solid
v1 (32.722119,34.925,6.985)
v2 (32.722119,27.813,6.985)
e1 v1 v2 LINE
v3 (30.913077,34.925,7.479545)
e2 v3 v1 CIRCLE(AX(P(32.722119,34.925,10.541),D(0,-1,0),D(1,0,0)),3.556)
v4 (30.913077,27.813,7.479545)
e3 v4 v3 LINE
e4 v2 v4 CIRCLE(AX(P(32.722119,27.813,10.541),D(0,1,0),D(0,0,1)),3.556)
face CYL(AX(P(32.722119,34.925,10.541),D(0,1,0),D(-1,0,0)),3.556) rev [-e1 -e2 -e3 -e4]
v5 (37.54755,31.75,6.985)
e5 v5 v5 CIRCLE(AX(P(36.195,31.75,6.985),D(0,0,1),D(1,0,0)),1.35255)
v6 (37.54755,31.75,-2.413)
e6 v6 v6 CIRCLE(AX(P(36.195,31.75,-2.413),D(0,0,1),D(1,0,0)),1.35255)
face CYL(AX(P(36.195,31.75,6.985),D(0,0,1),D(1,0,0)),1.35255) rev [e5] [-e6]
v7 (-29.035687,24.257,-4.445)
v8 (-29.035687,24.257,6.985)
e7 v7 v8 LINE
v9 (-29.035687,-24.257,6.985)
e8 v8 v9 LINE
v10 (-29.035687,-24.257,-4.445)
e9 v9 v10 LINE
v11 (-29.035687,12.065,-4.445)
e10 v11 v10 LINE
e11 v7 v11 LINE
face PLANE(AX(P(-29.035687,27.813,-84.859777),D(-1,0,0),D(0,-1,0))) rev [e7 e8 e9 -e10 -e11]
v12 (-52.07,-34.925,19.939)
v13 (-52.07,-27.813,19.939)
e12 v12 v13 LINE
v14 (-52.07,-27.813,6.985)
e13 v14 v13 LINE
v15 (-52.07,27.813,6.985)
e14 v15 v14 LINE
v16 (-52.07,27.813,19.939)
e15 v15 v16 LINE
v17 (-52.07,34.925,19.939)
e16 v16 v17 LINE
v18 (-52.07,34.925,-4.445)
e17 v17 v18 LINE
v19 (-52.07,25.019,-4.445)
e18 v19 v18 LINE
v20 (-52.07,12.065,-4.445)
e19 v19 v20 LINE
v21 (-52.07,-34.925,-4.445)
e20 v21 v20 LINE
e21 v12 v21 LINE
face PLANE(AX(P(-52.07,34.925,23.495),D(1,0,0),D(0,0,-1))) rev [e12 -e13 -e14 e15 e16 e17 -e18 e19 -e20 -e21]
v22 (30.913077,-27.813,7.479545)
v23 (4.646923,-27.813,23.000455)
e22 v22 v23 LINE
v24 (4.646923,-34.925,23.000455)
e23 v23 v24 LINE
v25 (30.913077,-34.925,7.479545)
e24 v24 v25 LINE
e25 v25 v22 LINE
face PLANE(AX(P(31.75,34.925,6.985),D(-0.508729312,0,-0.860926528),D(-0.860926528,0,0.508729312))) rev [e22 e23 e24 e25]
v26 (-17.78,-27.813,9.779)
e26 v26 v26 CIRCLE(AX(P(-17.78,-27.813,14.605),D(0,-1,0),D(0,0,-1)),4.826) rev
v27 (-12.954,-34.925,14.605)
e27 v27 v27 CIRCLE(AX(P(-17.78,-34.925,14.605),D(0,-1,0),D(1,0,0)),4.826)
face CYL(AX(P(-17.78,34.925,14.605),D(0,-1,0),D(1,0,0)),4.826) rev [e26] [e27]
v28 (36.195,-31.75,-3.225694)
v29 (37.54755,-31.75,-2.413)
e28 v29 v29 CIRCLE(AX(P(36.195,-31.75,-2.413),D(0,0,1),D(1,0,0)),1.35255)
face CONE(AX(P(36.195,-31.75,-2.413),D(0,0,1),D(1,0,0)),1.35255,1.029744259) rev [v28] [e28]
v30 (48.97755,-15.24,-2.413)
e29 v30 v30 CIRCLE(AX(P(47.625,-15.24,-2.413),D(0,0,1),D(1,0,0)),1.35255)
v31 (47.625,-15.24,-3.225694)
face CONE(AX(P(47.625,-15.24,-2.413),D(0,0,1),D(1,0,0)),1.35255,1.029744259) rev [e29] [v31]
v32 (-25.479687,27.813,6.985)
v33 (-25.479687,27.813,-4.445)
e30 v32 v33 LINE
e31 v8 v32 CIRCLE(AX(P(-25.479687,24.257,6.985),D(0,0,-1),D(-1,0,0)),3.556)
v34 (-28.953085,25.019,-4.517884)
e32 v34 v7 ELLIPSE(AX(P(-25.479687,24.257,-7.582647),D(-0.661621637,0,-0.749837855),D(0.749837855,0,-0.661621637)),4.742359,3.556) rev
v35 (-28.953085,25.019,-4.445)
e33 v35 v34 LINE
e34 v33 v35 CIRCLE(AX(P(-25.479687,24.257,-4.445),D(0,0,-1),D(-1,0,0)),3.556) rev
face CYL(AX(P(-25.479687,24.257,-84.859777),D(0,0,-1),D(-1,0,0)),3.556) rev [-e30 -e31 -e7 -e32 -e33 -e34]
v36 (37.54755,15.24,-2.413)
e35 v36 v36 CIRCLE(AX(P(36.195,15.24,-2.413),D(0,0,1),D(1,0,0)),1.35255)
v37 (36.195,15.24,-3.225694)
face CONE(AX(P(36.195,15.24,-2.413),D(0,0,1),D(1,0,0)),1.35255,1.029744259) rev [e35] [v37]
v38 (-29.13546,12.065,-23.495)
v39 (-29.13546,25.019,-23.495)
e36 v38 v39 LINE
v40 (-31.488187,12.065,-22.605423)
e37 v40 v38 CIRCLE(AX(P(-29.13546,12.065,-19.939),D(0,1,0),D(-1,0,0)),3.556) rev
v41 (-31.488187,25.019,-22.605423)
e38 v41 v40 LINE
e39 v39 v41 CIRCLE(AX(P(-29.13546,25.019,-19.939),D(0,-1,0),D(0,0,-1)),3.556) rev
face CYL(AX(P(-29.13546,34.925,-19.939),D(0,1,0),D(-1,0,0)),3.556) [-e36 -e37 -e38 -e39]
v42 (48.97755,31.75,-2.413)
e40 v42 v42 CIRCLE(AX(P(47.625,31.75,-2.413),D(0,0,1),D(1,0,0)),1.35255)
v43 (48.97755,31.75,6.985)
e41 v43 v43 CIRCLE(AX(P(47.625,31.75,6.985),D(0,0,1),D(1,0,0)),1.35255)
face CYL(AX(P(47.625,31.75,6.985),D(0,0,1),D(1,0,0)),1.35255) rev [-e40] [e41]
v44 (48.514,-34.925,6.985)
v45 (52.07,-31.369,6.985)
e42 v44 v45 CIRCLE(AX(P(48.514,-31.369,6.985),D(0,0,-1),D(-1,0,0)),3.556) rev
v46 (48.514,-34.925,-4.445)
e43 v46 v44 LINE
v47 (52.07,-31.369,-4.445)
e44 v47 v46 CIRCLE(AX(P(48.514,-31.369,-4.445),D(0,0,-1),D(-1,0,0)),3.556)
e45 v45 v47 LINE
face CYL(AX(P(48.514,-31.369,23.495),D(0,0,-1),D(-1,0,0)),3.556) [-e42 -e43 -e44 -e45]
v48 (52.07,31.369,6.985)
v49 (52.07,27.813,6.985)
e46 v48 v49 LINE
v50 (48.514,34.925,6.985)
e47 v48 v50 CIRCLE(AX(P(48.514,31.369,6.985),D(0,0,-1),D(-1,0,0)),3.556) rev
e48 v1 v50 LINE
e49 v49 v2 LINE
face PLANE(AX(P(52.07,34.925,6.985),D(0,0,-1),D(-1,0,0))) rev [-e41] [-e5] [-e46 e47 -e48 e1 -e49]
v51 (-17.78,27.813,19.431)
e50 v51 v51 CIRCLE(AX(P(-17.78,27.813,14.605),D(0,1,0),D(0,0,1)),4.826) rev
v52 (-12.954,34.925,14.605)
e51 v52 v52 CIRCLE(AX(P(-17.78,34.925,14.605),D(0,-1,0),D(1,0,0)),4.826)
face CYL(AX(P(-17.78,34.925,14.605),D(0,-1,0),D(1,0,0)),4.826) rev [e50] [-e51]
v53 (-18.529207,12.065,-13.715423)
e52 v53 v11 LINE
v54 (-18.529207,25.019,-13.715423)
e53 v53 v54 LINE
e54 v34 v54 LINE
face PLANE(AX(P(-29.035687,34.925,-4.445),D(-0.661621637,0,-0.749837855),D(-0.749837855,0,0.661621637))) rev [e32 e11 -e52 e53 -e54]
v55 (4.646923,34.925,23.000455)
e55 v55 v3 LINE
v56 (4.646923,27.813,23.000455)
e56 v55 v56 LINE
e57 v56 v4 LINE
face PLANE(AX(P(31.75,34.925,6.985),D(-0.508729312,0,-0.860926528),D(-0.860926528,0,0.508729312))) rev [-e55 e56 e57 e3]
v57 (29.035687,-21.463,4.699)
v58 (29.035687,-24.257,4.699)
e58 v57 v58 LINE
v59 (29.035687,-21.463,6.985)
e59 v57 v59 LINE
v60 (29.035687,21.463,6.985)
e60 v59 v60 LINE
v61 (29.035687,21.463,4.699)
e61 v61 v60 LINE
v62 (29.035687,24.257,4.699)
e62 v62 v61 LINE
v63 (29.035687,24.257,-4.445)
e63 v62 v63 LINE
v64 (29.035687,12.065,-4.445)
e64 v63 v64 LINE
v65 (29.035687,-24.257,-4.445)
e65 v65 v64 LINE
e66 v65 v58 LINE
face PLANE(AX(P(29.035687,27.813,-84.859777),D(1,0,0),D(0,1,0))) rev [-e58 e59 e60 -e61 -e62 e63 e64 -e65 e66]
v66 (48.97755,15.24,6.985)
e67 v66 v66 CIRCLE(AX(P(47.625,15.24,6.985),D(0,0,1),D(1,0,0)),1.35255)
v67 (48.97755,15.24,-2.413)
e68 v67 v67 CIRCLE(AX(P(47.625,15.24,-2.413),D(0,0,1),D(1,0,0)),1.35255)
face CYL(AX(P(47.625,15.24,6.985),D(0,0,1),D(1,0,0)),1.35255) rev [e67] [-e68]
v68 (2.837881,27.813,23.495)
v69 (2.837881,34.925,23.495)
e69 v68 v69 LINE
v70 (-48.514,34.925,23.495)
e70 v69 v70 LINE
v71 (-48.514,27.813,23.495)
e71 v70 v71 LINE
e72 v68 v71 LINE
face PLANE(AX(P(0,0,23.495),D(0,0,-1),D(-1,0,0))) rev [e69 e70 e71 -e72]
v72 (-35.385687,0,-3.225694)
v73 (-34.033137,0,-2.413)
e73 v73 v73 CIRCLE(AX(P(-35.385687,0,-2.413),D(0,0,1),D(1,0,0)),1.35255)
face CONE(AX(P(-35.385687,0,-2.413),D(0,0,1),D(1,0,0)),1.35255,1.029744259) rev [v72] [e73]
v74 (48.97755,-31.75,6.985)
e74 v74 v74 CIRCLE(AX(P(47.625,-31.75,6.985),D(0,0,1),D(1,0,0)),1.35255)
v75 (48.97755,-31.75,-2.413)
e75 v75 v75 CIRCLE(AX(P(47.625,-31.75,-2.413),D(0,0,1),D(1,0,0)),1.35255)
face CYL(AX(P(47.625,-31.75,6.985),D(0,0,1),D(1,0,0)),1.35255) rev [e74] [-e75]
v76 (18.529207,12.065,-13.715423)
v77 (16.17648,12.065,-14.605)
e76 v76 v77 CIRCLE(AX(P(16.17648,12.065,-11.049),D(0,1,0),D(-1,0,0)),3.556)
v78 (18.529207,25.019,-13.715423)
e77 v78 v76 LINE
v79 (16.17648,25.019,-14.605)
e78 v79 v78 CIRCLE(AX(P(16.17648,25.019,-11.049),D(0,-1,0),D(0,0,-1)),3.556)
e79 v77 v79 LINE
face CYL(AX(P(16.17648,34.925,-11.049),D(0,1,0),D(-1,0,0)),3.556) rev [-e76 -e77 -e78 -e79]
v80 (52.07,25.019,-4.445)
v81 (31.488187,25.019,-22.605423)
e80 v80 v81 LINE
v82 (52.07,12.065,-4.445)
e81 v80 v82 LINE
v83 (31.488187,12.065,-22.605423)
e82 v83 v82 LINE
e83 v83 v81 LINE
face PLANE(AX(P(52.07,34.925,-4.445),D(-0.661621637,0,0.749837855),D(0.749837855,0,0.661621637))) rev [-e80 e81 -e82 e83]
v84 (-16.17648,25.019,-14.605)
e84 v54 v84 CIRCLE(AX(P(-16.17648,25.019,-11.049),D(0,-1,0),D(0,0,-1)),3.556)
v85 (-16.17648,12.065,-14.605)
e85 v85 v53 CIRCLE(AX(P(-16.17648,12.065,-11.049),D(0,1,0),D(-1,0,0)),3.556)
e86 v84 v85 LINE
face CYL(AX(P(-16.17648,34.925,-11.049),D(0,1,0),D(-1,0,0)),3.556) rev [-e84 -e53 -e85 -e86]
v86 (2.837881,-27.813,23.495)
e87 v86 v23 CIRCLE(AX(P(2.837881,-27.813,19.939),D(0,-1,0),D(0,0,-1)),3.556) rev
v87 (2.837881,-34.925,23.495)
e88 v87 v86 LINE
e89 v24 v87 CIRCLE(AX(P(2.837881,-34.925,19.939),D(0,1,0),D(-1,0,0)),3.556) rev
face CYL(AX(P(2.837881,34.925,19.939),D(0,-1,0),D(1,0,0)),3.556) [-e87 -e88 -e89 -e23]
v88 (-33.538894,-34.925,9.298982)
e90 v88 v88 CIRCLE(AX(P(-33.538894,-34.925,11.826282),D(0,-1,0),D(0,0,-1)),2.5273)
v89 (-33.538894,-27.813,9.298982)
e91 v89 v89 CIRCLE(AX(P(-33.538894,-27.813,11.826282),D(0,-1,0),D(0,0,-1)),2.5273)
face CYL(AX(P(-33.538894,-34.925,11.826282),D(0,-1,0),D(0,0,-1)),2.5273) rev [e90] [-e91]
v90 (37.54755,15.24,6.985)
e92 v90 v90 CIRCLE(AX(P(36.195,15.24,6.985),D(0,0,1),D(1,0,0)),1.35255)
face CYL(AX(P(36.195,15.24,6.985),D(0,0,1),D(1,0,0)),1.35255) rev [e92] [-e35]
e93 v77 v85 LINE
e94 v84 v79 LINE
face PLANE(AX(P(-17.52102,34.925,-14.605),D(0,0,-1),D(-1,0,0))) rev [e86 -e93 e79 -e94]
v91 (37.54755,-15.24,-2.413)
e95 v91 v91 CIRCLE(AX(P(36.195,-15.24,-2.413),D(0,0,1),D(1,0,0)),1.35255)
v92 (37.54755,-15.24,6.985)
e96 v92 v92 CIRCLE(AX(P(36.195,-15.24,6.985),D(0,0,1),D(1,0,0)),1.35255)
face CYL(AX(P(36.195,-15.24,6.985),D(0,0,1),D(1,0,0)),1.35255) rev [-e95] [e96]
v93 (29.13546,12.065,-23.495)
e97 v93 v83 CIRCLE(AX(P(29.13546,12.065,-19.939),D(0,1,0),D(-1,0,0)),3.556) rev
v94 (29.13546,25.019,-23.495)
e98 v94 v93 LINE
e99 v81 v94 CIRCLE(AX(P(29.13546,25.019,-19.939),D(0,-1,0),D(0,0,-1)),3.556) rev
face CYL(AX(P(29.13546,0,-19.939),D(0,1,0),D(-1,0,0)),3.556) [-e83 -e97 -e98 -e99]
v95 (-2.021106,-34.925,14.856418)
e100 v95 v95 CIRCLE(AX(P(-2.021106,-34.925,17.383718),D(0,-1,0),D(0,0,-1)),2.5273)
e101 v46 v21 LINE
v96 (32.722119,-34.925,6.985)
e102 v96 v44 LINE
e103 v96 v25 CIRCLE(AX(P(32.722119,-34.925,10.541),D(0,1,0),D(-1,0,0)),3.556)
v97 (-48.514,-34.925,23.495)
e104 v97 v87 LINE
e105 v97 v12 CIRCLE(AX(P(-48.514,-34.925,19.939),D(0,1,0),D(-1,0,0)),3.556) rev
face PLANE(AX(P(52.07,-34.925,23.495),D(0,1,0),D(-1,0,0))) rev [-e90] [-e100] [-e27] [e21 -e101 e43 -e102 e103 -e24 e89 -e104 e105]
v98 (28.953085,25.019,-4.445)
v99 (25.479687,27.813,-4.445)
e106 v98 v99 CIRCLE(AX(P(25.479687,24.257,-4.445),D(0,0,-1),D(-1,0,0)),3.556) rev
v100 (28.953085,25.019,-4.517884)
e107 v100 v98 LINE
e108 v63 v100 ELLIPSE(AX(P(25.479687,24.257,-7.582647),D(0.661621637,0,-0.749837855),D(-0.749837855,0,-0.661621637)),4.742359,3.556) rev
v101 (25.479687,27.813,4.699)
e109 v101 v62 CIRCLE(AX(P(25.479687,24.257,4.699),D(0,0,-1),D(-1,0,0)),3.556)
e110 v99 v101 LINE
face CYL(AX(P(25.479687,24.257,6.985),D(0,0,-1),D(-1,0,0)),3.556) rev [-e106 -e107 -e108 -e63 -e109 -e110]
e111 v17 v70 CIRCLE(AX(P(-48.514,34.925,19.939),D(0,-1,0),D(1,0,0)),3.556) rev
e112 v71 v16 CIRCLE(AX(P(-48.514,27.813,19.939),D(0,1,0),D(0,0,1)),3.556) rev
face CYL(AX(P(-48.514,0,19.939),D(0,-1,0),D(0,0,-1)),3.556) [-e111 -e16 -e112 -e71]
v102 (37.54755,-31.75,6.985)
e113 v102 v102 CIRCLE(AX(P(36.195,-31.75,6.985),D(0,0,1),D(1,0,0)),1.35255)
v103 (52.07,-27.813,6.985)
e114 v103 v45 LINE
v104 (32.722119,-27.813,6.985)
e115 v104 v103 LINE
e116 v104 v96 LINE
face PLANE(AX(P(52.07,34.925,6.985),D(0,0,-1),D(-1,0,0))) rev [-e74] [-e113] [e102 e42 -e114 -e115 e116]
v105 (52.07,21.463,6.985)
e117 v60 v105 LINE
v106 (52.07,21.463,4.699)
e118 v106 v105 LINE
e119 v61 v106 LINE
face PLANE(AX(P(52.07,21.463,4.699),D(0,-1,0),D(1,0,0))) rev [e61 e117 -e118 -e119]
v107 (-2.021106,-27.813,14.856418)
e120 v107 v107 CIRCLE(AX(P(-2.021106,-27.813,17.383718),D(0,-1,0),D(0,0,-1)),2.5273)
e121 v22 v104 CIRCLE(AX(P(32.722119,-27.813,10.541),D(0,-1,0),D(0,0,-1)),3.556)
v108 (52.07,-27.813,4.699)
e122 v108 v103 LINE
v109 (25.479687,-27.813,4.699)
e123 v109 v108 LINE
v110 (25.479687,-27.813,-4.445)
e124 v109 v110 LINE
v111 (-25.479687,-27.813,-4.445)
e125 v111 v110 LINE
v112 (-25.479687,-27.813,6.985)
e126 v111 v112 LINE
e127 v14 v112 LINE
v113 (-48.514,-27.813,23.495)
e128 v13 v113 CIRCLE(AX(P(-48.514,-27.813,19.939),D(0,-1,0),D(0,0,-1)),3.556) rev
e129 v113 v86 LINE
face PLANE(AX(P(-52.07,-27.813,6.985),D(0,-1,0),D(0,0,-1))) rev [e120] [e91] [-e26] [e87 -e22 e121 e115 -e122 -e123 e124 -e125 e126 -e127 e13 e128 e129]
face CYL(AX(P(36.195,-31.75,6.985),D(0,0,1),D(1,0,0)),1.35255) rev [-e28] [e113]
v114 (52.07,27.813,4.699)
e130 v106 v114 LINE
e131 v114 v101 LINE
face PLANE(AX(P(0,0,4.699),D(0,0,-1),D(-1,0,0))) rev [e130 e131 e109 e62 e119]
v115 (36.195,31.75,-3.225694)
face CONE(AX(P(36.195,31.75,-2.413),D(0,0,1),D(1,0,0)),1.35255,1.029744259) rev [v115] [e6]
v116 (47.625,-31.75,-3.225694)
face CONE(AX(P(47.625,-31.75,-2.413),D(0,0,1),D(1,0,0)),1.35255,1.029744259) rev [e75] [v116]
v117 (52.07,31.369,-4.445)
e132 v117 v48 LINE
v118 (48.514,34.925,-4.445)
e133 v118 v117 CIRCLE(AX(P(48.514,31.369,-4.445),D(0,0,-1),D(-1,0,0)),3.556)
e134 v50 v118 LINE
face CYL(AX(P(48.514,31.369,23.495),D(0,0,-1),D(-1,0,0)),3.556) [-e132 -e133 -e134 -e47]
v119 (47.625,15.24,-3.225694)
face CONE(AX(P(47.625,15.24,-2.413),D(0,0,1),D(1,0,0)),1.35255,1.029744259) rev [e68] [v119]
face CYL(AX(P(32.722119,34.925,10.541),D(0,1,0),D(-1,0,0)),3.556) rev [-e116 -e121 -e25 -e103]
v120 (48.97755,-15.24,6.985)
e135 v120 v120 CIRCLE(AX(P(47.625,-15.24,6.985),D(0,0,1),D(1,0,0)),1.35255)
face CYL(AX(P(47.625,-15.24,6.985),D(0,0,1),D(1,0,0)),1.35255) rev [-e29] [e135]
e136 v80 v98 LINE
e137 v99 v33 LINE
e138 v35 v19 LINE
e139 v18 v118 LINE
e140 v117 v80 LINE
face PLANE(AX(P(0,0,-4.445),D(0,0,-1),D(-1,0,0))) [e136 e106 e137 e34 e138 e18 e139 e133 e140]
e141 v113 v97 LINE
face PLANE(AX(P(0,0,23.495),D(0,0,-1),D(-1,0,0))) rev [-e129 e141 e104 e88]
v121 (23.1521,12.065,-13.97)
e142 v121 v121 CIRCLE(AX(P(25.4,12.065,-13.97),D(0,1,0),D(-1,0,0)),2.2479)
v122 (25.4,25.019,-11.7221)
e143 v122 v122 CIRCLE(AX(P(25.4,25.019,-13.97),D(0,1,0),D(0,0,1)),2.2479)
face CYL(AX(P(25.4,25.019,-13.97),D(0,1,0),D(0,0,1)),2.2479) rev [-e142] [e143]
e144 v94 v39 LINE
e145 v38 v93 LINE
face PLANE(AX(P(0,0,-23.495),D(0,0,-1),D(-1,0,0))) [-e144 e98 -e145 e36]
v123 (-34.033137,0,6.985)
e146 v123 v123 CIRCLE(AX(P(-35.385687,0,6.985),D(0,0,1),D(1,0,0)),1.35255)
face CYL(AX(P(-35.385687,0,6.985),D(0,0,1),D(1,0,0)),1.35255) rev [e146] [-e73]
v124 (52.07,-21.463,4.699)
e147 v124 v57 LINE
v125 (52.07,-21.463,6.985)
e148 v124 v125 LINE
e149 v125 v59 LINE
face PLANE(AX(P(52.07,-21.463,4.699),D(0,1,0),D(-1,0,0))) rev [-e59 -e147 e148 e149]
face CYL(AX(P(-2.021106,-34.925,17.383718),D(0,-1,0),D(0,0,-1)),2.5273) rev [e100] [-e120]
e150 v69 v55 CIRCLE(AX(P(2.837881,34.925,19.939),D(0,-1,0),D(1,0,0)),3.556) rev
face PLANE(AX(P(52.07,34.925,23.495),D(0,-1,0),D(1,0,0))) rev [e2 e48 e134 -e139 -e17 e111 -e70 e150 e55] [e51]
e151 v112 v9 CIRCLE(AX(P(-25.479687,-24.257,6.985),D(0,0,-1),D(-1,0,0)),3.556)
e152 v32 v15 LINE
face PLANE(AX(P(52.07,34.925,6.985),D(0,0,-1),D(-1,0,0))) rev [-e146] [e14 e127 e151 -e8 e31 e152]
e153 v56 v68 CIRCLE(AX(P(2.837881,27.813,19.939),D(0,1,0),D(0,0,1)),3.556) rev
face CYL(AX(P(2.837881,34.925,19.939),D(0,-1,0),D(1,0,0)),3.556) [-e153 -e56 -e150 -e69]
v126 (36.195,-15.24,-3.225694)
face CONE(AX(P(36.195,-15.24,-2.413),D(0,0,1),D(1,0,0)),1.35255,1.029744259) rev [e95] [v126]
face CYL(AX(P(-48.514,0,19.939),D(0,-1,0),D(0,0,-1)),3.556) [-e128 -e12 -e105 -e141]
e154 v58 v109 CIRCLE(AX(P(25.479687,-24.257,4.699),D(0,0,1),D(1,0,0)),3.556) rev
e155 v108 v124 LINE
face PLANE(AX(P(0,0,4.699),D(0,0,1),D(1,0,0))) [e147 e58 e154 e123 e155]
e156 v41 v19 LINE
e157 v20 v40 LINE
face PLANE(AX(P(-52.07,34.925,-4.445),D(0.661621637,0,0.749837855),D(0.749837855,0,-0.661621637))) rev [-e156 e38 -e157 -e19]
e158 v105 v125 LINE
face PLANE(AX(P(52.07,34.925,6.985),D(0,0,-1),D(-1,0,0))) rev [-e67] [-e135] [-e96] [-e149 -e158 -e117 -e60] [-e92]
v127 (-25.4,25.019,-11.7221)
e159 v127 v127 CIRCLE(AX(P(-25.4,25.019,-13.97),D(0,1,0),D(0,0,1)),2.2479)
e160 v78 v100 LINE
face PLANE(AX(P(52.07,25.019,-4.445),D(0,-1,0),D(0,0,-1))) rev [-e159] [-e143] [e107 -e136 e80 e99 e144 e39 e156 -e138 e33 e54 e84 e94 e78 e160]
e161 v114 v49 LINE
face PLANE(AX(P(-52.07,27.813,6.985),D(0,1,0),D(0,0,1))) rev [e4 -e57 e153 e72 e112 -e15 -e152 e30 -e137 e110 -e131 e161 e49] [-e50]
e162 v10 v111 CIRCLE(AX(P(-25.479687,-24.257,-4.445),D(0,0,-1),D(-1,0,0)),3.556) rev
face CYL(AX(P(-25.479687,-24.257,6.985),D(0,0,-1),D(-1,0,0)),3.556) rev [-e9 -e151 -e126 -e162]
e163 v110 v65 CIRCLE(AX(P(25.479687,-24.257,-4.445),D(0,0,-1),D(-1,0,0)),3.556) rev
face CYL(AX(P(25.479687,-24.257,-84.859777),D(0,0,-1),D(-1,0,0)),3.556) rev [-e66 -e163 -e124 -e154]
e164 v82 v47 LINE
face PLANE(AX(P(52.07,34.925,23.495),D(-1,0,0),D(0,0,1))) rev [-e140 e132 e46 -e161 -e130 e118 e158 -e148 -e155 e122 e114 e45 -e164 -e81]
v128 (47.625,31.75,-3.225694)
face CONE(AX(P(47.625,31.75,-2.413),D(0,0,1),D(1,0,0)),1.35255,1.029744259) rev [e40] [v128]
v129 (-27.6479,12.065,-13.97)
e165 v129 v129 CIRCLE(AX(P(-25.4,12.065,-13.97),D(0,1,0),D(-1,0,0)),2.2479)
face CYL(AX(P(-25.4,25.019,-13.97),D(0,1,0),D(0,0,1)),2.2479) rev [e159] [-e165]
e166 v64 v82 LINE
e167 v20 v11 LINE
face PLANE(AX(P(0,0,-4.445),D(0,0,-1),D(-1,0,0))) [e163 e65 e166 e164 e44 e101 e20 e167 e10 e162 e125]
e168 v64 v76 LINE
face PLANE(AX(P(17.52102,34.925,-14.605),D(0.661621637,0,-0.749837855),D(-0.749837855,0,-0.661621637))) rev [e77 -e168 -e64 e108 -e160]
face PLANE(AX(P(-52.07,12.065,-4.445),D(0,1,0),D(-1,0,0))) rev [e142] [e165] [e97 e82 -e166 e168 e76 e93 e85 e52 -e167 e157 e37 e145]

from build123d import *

# Parameters (mm, degrees)
SKETCH1_W                      = 104.14
SKETCH1_H                      = 69.85
BOSS_EXTRUDE1_DEPTH            = 23.495
SKETCH3_R                      = 4.826
PIVOT_POINTS_DEPTH             = 91.234818252
SKETCH17_W                     = 104.14
SKETCH17_H                     = 46.99
SKETCH17_H_2                   = 9.906
BOTTOM_CUTOUT_DEPTH            = 19.05
SIDE_CUTOUT_DEPTH              = 91.234818252
SKETCH20_W                     = 104.14
SKETCH20_H                     = 55.626
TOP_CUTOUT_DEPTH               = 16.51
CENTER_CUTOUT_REACH            = 71.714
SKETCH21_W                     = 58.071373626
SKETCH21_H                     = 55.626
F_8_CLEARANCE_HOLE1_D          = 4.4958
F_8_0_199_DIAMETER_HOLE1_D     = 5.0546
F_8_0_199_DIAMETER_HOLE1_DEPTH = 7.112
SKETCH30_W                     = 23.034313187
SKETCH30_H                     = 6.35
SPRING_CUTOUT_DEPTH            = 2.286
FILLET3_R                      = 3.556


# Read off the part's stored shape, not the designer's step: #6-32 Tapped Hole1
with BuildPart() as part:
    # Sketch1 → Boss-Extrude1 (new, symmetric)
    with BuildSketch(Plane.XY):
        Rectangle(SKETCH1_W, SKETCH1_H)
    extrude(amount=BOSS_EXTRUDE1_DEPTH, both=True)

    # Sketch3 → Pivot Points (cut, through all)
    with BuildSketch(Plane.XZ.offset(34.925)):
        with Locations((-17.78, 14.605)):
            Circle(SKETCH3_R)
    extrude(amount=-PIVOT_POINTS_DEPTH, mode=Mode.SUBTRACT)

    # Sketch17 → Bottom Cutout (cut)
    with BuildSketch(Plane(origin=(0, 0, -23.495), x_dir=(-1, 0, 0), z_dir=(0, 0, -1))):
        with Locations((0, -11.43)):
            Rectangle(SKETCH17_W, SKETCH17_H)
        with Locations((0, 29.972)):
            Rectangle(SKETCH17_W, SKETCH17_H_2)
    extrude(amount=-BOTTOM_CUTOUT_DEPTH, mode=Mode.SUBTRACT)

    # Sketch18 → Side Cutout (cut, through all)
    with BuildSketch(Plane.XZ.offset(34.925)):
        Polygon((52.07, 6.985), (31.75, 6.985), (3.81, 23.495), (52.07, 23.495), align=None)
        Polygon((52.07, -4.445), (30.48, -23.495), (52.07, -23.495), align=None)
        Polygon((-52.07, -4.445), (-30.48, -23.495), (-52.07, -23.495), align=None)
        Polygon((-29.035686813, -4.445), (-17.521020146, -14.605), (17.521020146, -14.605), (29.035686813, -4.445), align=None)
    extrude(amount=-SIDE_CUTOUT_DEPTH, mode=Mode.SUBTRACT)

    # Sketch20 → Top Cutout (cut)
    with BuildSketch(Plane.XY.offset(23.495)):
        Rectangle(SKETCH20_W, SKETCH20_H)
    extrude(amount=-TOP_CUTOUT_DEPTH, mode=Mode.SUBTRACT)

    # Center Cutout: up to this face of the body (flat: up to its plane)
    center_cutout_end = Plane(part.part.faces().sort_by_distance((0, -1.657135224, -4.445))[0])
    # Sketch21 → Center Cutout (cut, up to the picked face)
    with BuildSketch(Plane.XY.offset(6.985), mode=Mode.PRIVATE) as center_cutout_sk1:
        Rectangle(SKETCH21_W, SKETCH21_H)
    center_cutout_tool1 = split(extrude(center_cutout_sk1.sketch, amount=-CENTER_CUTOUT_REACH, mode=Mode.PRIVATE), bisect_by=center_cutout_end, keep=Keep.BOTH, mode=Mode.PRIVATE)
    add(center_cutout_tool1.solids().sort_by(Axis((0, 0, 6.985), (0, 0, -1)))[0], mode=Mode.SUBTRACT)

    # #8 Clearance Hole1 (through all)
    with Locations(Plane(origin=(0, 25.019, 0), x_dir=(1, 0, 0), z_dir=(0, 1, 0))):
        with Locations((25.4, 13.97), (-25.4, 13.97)):
            Hole(F_8_CLEARANCE_HOLE1_D / 2)

    # #8 (0.199) Diameter Hole1
    with Locations(Plane(origin=(0, -34.925, 0), x_dir=(-1, 0, 0), z_dir=(0, -1, 0))):
        with Locations((17.78, -14.605), (2.021106336, -17.383718139), (33.538893664, -11.826281861)):
            Hole(F_8_0_199_DIAMETER_HOLE1_D / 2, depth=F_8_0_199_DIAMETER_HOLE1_DEPTH)

    # Sketch30 → Spring Cutout (cut)
    with BuildSketch(Plane.XY.offset(6.985)):
        with Locations((40.552843407, 24.638)):
            Rectangle(SKETCH30_W, SKETCH30_H)
        with Locations((40.552843407, -24.638)):
            Rectangle(SKETCH30_W, SKETCH30_H)
    extrude(amount=-SPRING_CUTOUT_DEPTH, mode=Mode.SUBTRACT)

    # #6-32 Tapped Hole1 outline → #6-32 Tapped Hole1 (revolve, cut)
    with BuildSketch(Plane(origin=(36.195, -31.75, 0), x_dir=(1, 0, 0), z_dir=(0, -1, 0))):
        Polygon((0, 6.985), (0, -3.22569403), (1.35255, -2.413), (1.35255, 6.985), align=None)
    revolve(axis=Axis((36.195, -31.75, 0), (0, 0, 1)), mode=Mode.SUBTRACT)

    # 6-32 Tapped Hole1 2 outline → 6-32 Tapped Hole1 2 (revolve, cut)
    with BuildSketch(Plane(origin=(36.195, -15.24, 0), x_dir=(1, 0, 0), z_dir=(0, -1, 0))):
        Polygon((0, 6.985), (0, -3.22569403), (1.35255, -2.413), (1.35255, 6.985), align=None)
    revolve(axis=Axis((36.195, -15.24, 0), (0, 0, 1)), mode=Mode.SUBTRACT)

    # 6-32 Tapped Hole1 3 outline → 6-32 Tapped Hole1 3 (revolve, cut)
    with BuildSketch(Plane(origin=(47.625, -15.24, 0), x_dir=(1, 0, 0), z_dir=(0, -1, 0))):
        Polygon((0, 6.985), (0, -3.22569403), (1.35255, -2.413), (1.35255, 6.985), align=None)
    revolve(axis=Axis((47.625, -15.24, 0), (0, 0, 1)), mode=Mode.SUBTRACT)

    # 6-32 Tapped Hole1 4 outline → 6-32 Tapped Hole1 4 (revolve, cut)
    with BuildSketch(Plane(origin=(47.625, -31.75, 0), x_dir=(1, 0, 0), z_dir=(0, -1, 0))):
        Polygon((0, 6.985), (0, -3.22569403), (1.35255, -2.413), (1.35255, 6.985), align=None)
    revolve(axis=Axis((47.625, -31.75, 0), (0, 0, 1)), mode=Mode.SUBTRACT)

    # 6-32 Tapped Hole1 5 outline → 6-32 Tapped Hole1 5 (revolve, cut)
    with BuildSketch(Plane(origin=(47.625, 31.75, 0), x_dir=(1, 0, 0), z_dir=(0, -1, 0))):
        Polygon((0, 6.985), (0, -3.22569403), (1.35255, -2.413), (1.35255, 6.985), align=None)
    revolve(axis=Axis((47.625, 31.75, 0), (0, 0, 1)), mode=Mode.SUBTRACT)

    # 6-32 Tapped Hole1 6 outline → 6-32 Tapped Hole1 6 (revolve, cut)
    with BuildSketch(Plane(origin=(36.195, 15.24, 0), x_dir=(1, 0, 0), z_dir=(0, -1, 0))):
        Polygon((0, 6.985), (0, -3.22569403), (1.35255, -2.413), (1.35255, 6.985), align=None)
    revolve(axis=Axis((36.195, 15.24, 0), (0, 0, 1)), mode=Mode.SUBTRACT)

    # 6-32 Tapped Hole1 7 outline → 6-32 Tapped Hole1 7 (revolve, cut)
    with BuildSketch(Plane(origin=(47.625, 15.24, 0), x_dir=(1, 0, 0), z_dir=(0, -1, 0))):
        Polygon((0, 6.985), (0, -3.22569403), (1.35255, -2.413), (1.35255, 6.985), align=None)
    revolve(axis=Axis((47.625, 15.24, 0), (0, 0, 1)), mode=Mode.SUBTRACT)

    # 6-32 Tapped Hole1 8 outline → 6-32 Tapped Hole1 8 (revolve, cut)
    with BuildSketch(Plane(origin=(36.195, 31.75, 0), x_dir=(1, 0, 0), z_dir=(0, -1, 0))):
        Polygon((0, 6.985), (0, -3.22569403), (1.35255, -2.413), (1.35255, 6.985), align=None)
    revolve(axis=Axis((36.195, 31.75, 0), (0, 0, 1)), mode=Mode.SUBTRACT)

    # 6-32 Tapped Hole1 9 outline → 6-32 Tapped Hole1 9 (revolve, cut)
    with BuildSketch(Plane(origin=(-35.385686813, 0, 0), x_dir=(1, 0, 0), z_dir=(0, -1, 0))):
        Polygon((0, 6.985), (0, -3.22569403), (1.35255, -2.413), (1.35255, 6.985), align=None)
    revolve(axis=Axis((-35.385686813, 0, 0), (0, 0, 1)), mode=Mode.SUBTRACT)

    # Fillet3
    # the kernel refuses this fillet: 3.556 mm, written as the material it adds along each edge
    with BuildSketch(Plane(origin=(31.75, -34.925, 6.985), x_dir=(1, 0, 0), z_dir=(0, 1, 0)), Plane(origin=(31.75, 27.813, 6.985), x_dir=(1, 0, 0), z_dir=(0, 1, 0))) as fillet3_piece_1:
        with BuildLine():
            CenterArc((FILLET3_R * 0.273374206028, -FILLET3_R), FILLET3_R, 90, 30.579226872)
            Line((-FILLET3_R * 0.235355106099, -FILLET3_R * 0.139073471786), (0, 0))
            Line((0, 0), (FILLET3_R * 0.273374206028, 0))
        make_face()
    extrude(amount=7.112)
    with BuildSketch(Plane(origin=(29.035686813, -27.813, 4.699), x_dir=(-1, 0, 0), z_dir=(0, 0, -1))) as fillet3_piece_2:
        with BuildLine():
            CenterArc((FILLET3_R, FILLET3_R), FILLET3_R, 180, 90)
            Line((0, FILLET3_R), (0, 0))
            Line((0, 0), (FILLET3_R, 0))
        make_face()
    extrude(amount=9.144)
    with BuildSketch(Plane(origin=(29.035686813, 27.813, 4.699), x_dir=(-1, 0, 0), z_dir=(0, 0, -1))) as fillet3_piece_3:
        with BuildLine():
            CenterArc((FILLET3_R, -FILLET3_R), FILLET3_R, 90, 90)
            Line((0, -FILLET3_R), (0, 0))
            Line((0, 0), (FILLET3_R, 0))
        make_face()
    extrude(amount=9.144)
    with BuildSketch(Plane(origin=(29.035686813, 27.813, 4.699), x_dir=(-1, 0, 0), z_dir=(0, 0, -1))) as fillet3_piece_4_section:
        with BuildLine():
            CenterArc((FILLET3_R, -FILLET3_R), FILLET3_R, 90, 90)
            Line((0, -FILLET3_R), (0, 0))
            Line((0, 0), (FILLET3_R, 0))
        make_face()
    fillet3_piece_4 = extrude(amount=18.034, mode=Mode.PRIVATE)
    fillet3_piece_4 = split(fillet3_piece_4, bisect_by=Plane(origin=(28.996396746, 25.019, -4.462333853), z_dir=(0, -1, 0)), keep=Keep.TOP, mode=Mode.PRIVATE)
    add(fillet3_piece_4)
    with BuildSketch(Plane(origin=(-29.035686813, 27.813, 6.985), x_dir=(1, 0, 0), z_dir=(0, 0, -1))) as fillet3_piece_5:
        with BuildLine():
            CenterArc((FILLET3_R, FILLET3_R), FILLET3_R, 180, 90)
            Line((0, FILLET3_R), (0, 0))
            Line((0, 0), (FILLET3_R, 0))
        make_face()
    extrude(amount=11.43)
    with BuildSketch(Plane(origin=(-29.035686813, 27.813, 6.985), x_dir=(1, 0, 0), z_dir=(0, 0, -1))) as fillet3_piece_6_section:
        with BuildLine():
            CenterArc((FILLET3_R, FILLET3_R), FILLET3_R, 180, 90)
            Line((0, FILLET3_R), (0, 0))
            Line((0, 0), (FILLET3_R, 0))
        make_face()
    fillet3_piece_6 = extrude(amount=20.32, mode=Mode.PRIVATE)
    fillet3_piece_6 = split(fillet3_piece_6, bisect_by=Plane(origin=(-28.996396746, 25.019, -4.462333853), z_dir=(0, -1, 0)), keep=Keep.TOP, mode=Mode.PRIVATE)
    add(fillet3_piece_6)
    with BuildSketch(Plane(origin=(-29.035686813, -27.813, 6.985), x_dir=(1, 0, 0), z_dir=(0, 0, -1))) as fillet3_piece_7:
        with BuildLine():
            CenterArc((FILLET3_R, -FILLET3_R), FILLET3_R, 90, 90)
            Line((0, -FILLET3_R), (0, 0))
            Line((0, 0), (FILLET3_R, 0))
        make_face()
    extrude(amount=11.43)
    with BuildSketch(Plane(origin=(17.521020146, 12.065, -14.605), x_dir=(-1, 0, 0), z_dir=(0, 1, 0)), Plane(origin=(-17.521020146, 12.065, -14.605), x_dir=(-0.7498378553650912, 0, 0.6616216370868477), z_dir=(0, 1, 0))) as fillet3_piece_8:
        with BuildLine():
            CenterArc((FILLET3_R * 0.378104539834, FILLET3_R), FILLET3_R, 228.576334375, 41.423665625)
            Line((-FILLET3_R * 0.283517097253, FILLET3_R * 0.250162144635), (0, 0))
            Line((0, 0), (FILLET3_R * 0.378104539834, 0))
        make_face()
    extrude(amount=12.954)
    # the kernel refuses this fillet: 3.556 mm, written as the material it takes off along each edge
    with BuildSketch(Plane(origin=(3.81, -37.355296692, 23.495), x_dir=(-1, 0, 0), z_dir=(0, 1, 0))) as fillet3_2_piece_1:
        with BuildLine():
            CenterArc((FILLET3_R * 0.273374206028, -FILLET3_R), FILLET3_R, 90, 30.579226872)
            Line((-FILLET3_R * 0.235355106099, -FILLET3_R * 0.139073471786), (0, 0))
            Line((0, 0), (FILLET3_R * 0.273374206028, 0))
        make_face()
    extrude(amount=11.972593383, mode=Mode.SUBTRACT)
    with BuildSketch(Plane(origin=(-52.07, -18.923, 23.495), x_dir=(1, 0, 0), z_dir=(0, -1, 0)), Plane(origin=(-52.07, 43.815, 23.495), x_dir=(1, 0, 0), z_dir=(0, -1, 0))) as fillet3_2_piece_2:
        with BuildLine():
            CenterArc((FILLET3_R, -FILLET3_R), FILLET3_R, 90, 90)
            Line((0, -FILLET3_R), (0, 0))
            Line((0, 0), (FILLET3_R, 0))
        make_face()
    extrude(amount=24.892, mode=Mode.SUBTRACT)
    with BuildSketch(Plane(origin=(52.07, 34.925, 15.875), x_dir=(-1, 0, 0), z_dir=(0, 0, -1))) as fillet3_2_piece_3:
        with BuildLine():
            CenterArc((FILLET3_R, -FILLET3_R), FILLET3_R, 90, 90)
            Line((0, -FILLET3_R), (0, 0))
            Line((0, 0), (FILLET3_R, 0))
        make_face()
    extrude(amount=29.21, mode=Mode.SUBTRACT)
    with BuildSketch(Plane(origin=(52.07, -34.925, 15.875), x_dir=(-1, 0, 0), z_dir=(0, 0, -1))) as fillet3_2_piece_4:
        with BuildLine():
            CenterArc((FILLET3_R, FILLET3_R), FILLET3_R, 180, 90)
            Line((0, FILLET3_R), (0, 0))
            Line((0, 0), (FILLET3_R, 0))
        make_face()
    extrude(amount=29.21, mode=Mode.SUBTRACT)
    with BuildSketch(Plane(origin=(3.81, 25.382703308, 23.495), x_dir=(0.8609265282143158, 0, -0.5087293121266405), z_dir=(0, 1, 0))) as fillet3_2_piece_5:
        with BuildLine():
            CenterArc((FILLET3_R * 0.273374206028, FILLET3_R), FILLET3_R, 239.420773128, 30.579226872)
            Line((-FILLET3_R * 0.235355106099, FILLET3_R * 0.139073471786), (0, 0))
            Line((0, 0), (FILLET3_R * 0.273374206028, 0))
        make_face()
    extrude(amount=11.972593383, mode=Mode.SUBTRACT)
    with BuildSketch(Plane(origin=(-30.48, 8.703650641, -23.495), x_dir=(-0.7498378553650943, 0, 0.6616216370868445), z_dir=(0, 1, 0))) as fillet3_2_piece_6:
        with BuildLine():
            CenterArc((FILLET3_R * 0.378104539834, FILLET3_R), FILLET3_R, 228.576334375, 41.423665625)
            Line((-FILLET3_R * 0.283517097253, FILLET3_R * 0.250162144635), (0, 0))
            Line((0, 0), (FILLET3_R * 0.378104539834, 0))
        make_face()
    extrude(amount=19.676698718, mode=Mode.SUBTRACT)
    with BuildSketch(Plane(origin=(30.48, 8.703650641, -23.495), x_dir=(0.7498378553650921, 0, 0.6616216370868468), z_dir=(0, 1, 0))) as fillet3_2_piece_7:
        with BuildLine():
            CenterArc((FILLET3_R * 0.378104539834, -FILLET3_R), FILLET3_R, 90, 41.423665625)
            Line((-FILLET3_R * 0.283517097253, -FILLET3_R * 0.250162144635), (0, 0))
            Line((0, 0), (FILLET3_R * 0.378104539834, 0))
        make_face()
    extrude(amount=19.676698718, mode=Mode.SUBTRACT)


solid = part.part
